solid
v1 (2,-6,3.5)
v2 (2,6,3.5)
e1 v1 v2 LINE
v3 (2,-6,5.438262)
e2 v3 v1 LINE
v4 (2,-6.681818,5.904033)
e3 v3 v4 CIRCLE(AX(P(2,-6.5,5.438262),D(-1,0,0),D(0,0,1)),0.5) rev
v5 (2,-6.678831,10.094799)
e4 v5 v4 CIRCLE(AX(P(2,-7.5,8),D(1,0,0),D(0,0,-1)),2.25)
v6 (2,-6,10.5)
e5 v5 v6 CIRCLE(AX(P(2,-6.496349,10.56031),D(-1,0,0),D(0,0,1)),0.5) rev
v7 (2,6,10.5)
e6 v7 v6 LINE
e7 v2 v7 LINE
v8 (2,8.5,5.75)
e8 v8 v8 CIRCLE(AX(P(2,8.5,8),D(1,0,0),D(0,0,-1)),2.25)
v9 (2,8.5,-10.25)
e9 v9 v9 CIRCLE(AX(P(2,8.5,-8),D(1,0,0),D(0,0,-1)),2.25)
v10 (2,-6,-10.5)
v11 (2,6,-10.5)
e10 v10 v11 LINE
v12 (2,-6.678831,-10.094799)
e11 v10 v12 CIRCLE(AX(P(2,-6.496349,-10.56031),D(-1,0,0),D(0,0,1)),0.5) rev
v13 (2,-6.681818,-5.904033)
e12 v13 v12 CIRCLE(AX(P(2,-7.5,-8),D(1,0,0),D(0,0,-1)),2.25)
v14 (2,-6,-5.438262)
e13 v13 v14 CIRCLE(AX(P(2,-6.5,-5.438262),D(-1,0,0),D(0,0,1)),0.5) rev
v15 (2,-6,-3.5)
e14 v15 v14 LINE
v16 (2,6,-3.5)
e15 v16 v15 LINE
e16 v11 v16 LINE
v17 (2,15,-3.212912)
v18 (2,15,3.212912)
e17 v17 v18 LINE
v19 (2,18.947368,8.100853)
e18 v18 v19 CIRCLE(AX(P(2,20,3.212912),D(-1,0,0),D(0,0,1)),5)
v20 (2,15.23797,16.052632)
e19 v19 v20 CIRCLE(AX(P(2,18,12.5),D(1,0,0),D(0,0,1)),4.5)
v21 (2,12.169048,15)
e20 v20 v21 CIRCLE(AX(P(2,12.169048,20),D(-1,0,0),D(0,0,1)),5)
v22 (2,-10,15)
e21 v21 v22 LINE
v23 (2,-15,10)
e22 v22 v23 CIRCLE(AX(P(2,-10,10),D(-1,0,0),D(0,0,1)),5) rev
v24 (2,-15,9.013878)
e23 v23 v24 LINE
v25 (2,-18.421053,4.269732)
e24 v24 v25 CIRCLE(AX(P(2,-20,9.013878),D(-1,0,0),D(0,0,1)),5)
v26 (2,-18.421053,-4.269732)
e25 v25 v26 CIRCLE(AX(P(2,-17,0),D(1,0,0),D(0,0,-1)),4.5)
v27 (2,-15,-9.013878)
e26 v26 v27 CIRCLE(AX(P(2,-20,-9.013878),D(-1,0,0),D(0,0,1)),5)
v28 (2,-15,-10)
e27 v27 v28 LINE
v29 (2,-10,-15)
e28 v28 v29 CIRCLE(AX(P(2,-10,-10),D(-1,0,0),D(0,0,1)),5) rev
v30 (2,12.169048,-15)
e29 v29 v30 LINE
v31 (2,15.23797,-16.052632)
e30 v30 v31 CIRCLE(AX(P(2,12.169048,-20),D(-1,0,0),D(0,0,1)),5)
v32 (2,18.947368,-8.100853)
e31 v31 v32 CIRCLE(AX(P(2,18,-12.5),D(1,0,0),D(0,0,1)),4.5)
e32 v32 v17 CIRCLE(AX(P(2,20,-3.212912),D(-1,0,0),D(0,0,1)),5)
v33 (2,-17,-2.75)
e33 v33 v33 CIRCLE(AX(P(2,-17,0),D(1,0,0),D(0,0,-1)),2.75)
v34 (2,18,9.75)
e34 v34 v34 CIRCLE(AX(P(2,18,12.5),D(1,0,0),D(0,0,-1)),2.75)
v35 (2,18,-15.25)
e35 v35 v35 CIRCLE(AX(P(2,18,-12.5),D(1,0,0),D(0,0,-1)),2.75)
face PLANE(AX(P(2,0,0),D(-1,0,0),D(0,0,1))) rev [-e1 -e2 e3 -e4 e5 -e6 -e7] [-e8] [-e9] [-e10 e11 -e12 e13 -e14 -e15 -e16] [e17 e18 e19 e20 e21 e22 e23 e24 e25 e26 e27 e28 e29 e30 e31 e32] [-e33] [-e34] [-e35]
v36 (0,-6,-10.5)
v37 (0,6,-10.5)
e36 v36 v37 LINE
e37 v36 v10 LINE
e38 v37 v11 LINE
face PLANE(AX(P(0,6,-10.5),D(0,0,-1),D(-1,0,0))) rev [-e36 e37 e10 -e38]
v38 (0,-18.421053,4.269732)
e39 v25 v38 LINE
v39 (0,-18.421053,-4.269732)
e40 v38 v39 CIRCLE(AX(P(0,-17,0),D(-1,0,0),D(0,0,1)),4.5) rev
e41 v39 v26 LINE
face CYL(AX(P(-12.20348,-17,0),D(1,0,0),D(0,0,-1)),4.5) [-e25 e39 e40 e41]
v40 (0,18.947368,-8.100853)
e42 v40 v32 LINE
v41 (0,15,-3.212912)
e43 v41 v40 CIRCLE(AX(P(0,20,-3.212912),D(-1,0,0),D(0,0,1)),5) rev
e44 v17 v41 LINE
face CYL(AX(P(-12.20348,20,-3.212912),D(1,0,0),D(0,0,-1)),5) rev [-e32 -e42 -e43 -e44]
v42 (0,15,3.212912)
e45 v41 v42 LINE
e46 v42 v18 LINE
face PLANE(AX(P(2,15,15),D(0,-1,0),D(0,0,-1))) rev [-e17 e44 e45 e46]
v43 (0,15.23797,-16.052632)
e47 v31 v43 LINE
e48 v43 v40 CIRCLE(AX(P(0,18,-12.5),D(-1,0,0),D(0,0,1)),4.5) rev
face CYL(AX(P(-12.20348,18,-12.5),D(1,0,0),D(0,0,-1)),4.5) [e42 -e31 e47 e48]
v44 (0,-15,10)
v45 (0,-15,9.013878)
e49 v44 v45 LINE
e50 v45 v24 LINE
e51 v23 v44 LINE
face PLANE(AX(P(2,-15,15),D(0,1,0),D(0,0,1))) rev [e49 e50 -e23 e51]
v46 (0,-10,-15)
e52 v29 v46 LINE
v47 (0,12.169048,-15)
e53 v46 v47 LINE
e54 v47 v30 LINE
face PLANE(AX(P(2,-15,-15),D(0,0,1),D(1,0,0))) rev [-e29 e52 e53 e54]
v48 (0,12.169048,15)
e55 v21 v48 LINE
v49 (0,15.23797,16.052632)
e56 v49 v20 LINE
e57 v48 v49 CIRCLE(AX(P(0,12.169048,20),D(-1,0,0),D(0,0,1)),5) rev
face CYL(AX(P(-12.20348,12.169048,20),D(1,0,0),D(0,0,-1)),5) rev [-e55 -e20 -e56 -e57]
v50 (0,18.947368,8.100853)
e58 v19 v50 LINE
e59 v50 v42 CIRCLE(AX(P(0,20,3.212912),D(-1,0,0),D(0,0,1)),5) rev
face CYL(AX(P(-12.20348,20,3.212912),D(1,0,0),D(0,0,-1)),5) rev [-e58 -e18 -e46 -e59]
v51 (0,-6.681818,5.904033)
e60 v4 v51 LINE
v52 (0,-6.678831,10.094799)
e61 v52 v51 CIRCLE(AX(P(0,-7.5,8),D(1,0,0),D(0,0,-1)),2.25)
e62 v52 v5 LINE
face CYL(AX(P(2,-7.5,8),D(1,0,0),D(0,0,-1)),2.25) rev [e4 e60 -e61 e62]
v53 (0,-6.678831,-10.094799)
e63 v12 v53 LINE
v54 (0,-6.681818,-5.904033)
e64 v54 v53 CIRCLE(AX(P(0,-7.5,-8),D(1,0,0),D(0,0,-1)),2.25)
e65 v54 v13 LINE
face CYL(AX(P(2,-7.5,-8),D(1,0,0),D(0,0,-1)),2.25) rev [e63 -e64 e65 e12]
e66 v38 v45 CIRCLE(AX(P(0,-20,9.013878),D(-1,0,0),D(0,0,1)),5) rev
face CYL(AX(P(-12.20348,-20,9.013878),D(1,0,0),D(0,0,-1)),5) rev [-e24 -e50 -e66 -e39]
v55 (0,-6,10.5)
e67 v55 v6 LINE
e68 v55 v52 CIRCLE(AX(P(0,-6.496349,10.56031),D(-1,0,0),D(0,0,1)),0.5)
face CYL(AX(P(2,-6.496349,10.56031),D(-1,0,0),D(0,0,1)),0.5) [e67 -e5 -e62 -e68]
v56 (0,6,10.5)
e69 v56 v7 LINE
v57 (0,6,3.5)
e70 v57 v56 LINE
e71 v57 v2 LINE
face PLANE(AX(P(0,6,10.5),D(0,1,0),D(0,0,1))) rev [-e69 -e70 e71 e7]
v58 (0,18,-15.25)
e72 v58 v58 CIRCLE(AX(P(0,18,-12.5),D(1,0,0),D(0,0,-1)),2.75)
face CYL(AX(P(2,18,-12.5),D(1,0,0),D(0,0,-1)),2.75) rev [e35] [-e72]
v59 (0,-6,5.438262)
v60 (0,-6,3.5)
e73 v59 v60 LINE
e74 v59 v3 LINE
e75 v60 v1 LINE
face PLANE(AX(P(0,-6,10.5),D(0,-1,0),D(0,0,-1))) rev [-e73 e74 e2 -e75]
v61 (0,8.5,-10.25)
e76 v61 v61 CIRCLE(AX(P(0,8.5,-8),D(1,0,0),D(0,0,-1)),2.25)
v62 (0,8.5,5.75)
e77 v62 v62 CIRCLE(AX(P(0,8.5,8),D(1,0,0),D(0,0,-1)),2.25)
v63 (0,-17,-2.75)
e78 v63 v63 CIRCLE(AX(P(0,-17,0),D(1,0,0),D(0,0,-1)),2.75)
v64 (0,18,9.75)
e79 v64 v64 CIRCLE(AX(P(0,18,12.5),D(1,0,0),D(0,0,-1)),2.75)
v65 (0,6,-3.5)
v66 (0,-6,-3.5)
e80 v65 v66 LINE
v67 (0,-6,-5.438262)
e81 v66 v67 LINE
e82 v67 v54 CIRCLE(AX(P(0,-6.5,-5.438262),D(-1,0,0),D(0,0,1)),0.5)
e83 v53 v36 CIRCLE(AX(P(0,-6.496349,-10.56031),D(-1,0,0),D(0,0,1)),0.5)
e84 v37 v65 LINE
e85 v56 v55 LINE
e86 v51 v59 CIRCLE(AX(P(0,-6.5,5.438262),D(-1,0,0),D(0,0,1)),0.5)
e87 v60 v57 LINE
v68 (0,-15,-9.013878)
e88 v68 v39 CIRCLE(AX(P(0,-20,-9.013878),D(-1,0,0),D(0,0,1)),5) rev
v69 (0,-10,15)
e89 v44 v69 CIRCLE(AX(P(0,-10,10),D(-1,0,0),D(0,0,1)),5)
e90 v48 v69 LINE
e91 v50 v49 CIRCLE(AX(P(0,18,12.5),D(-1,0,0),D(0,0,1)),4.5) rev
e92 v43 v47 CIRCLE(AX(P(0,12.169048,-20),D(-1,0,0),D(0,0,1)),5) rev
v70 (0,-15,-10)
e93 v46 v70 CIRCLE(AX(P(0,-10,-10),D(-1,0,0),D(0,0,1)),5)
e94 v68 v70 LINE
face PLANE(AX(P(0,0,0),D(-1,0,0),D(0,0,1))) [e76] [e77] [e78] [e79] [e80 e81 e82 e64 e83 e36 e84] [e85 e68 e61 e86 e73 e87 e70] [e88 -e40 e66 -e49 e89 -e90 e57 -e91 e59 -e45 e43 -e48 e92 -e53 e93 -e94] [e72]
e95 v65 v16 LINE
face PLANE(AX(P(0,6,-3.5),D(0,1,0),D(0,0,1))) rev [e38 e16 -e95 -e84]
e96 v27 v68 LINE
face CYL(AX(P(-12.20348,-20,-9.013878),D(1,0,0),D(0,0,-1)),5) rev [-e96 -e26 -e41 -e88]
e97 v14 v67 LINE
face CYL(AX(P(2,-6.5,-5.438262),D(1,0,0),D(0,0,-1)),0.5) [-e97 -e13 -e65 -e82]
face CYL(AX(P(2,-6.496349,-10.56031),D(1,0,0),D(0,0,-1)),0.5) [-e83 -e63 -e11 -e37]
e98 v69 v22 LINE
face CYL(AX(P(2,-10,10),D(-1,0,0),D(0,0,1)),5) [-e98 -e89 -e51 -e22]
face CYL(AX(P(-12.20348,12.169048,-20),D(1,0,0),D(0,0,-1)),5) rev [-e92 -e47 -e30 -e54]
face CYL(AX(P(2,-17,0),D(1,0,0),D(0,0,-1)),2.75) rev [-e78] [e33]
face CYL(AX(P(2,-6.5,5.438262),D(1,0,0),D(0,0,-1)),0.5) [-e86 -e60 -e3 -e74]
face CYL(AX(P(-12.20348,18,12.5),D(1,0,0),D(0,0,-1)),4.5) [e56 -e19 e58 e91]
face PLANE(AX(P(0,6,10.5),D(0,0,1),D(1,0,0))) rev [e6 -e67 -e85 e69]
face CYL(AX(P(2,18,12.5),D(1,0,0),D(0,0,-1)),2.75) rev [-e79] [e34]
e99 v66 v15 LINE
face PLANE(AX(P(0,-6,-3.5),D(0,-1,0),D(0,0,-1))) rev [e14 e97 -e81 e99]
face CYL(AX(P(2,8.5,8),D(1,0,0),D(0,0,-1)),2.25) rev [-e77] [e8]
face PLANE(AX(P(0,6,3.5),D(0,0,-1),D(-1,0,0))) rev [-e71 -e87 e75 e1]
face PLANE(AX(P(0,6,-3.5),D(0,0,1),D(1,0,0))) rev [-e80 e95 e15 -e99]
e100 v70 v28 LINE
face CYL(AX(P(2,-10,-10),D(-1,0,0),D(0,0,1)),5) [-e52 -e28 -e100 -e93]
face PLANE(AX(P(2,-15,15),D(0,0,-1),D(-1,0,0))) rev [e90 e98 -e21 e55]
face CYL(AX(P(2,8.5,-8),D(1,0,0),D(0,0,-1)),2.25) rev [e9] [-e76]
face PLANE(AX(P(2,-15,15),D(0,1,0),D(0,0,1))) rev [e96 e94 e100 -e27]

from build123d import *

# Parameters (mm, degrees)
SKETCH1_W            = 30
SKETCH1_H            = 30
BOSS_EXTRUDE1_DEPTH  = 2
SKETCH2_W            = 7
SKETCH2_H            = 12
CUT_EXTRUDE1_DEPTH   = 22.307275753
M4_CLEARANCE_HOLE1_D = 4.5
BOSS_EXTRUDE2_DEPTH  = 2
M5_CLEARANCE_HOLE1_D = 5.5
FILLET1_R            = 5
FILLET2_R            = 0.5


with BuildPart() as part:
    # Sketch1 → Boss-Extrude1 (new body)
    with BuildSketch(Plane(origin=(0, 0, 0), x_dir=(0, 0, -1), z_dir=(1, 0, 0))):
        Rectangle(SKETCH1_W, SKETCH1_H)
    extrude(amount=BOSS_EXTRUDE1_DEPTH)

    # Sketch2 → Cut-Extrude1 (cut, through all)
    with BuildSketch(Plane(origin=(2, 0, 0), x_dir=(0, 0, -1), z_dir=(1, 0, 0))):
        with Locations((-7, 0)):
            Rectangle(SKETCH2_W, SKETCH2_H)
        with Locations((7, 0)):
            Rectangle(SKETCH2_W, SKETCH2_H)
    extrude(amount=-CUT_EXTRUDE1_DEPTH, mode=Mode.SUBTRACT)

    # M4 Clearance Hole1 (through all)
    with Locations(Plane(origin=(2, 0, 0), x_dir=(0, 0, -1), z_dir=(1, 0, 0))):
        with Locations((-8, 8.5), (-8, -7.5), (8, 8.5), (8, -7.5)):
            Hole(M4_CLEARANCE_HOLE1_D / 2)

    # Sketch6 → Boss-Extrude2 (add)
    with BuildSketch(Plane(origin=(2, 0, 0), x_dir=(0, 0, -1), z_dir=(1, 0, 0))):
        with BuildLine():
            Line((-15, 14.258342613), (-15, 15))
            Line((-15, 15), (-9.145898034, 15))
            ThreePointArc((-9.145898034, 15), (-13.065585062, 22.464315573), (-15, 14.258342613))
        make_face()
        with BuildLine():
            Line((15, 14.258342613), (15, 15))
            Line((15, 15), (9.145898034, 15))
            ThreePointArc((9.145898034, 15), (13.065585062, 22.464315573), (15, 14.258342613))
        make_face()
        with BuildLine():
            Line((-4.031128874, -15), (4.031128874, -15))
            ThreePointArc((4.031128874, -15), (0, -21.5), (-4.031128874, -15))
        make_face()
    extrude(amount=-BOSS_EXTRUDE2_DEPTH)

    # M5 Clearance Hole1 (through all)
    with Locations(Plane(origin=(2, 0, 0), x_dir=(0, 0, -1), z_dir=(1, 0, 0))):
        with Locations((-12.5, 18), (12.5, 18), (0, -17)):
            Hole(M5_CLEARANCE_HOLE1_D / 2)

    # Fillet1
    fillet1_edges = [part.edges().sort_by_distance(p)[0] for p in [
        (1, -15, -15),
        (1, -15, 15),
        (1, 14.258342613, 15),
        (1, 15, 9.145898034),
        (1, 14.258342613, -15),
        (1, 15, -9.145898034),
        (1, -15, 4.031128874),
        (1, -15, -4.031128874),
    ]]
    fillet(fillet1_edges, radius=FILLET1_R)

    # Fillet2
    # the kernel refuses this fillet: 0.5 mm, written as the material it takes off along each edge
    with BuildSketch(Plane(origin=(4.211716771, -6, -6.322949017), x_dir=(0, 0, 1), z_dir=(-1, 0, 0))) as fillet2_piece_1:
        with BuildLine():
            CenterArc((0.884686708, -0.5), FILLET2_R, 90, 111.323686263)
            Line((0.418916219, -0.681818182), (0.409600809, -0.685454545))
            ThreePointArc((0.409600809, -0.685454545), (0.23149304, -0.327370599), (-0.00745356, -0.006666667))
            Line((-0.00745356, -0.006666667), (0, 0.01))
            Line((0, 0.01), (0.884686708, 0.01))
            Line((0.884686708, 0.01), (0.884686708, 0))
        make_face()
    extrude(amount=6.423433542, mode=Mode.SUBTRACT)
    with BuildSketch(Plane(origin=(4.057372542, -6, -9.677050983), x_dir=(0, -0.851655260409685, -0.5241023921110375), z_dir=(-1, 0, 0))) as fillet2_piece_2:
        with BuildLine():
            CenterArc((0.885636575, -0.492093973), FILLET2_R, 100.202478529, 104.477512186)
            Line((0.431309548, -0.700868859), (0.422223008, -0.705044357))
            ThreePointArc((0.422223008, -0.705044357), (0.207138222, -0.355675454), (-0.008516553, -0.005241024))
            Line((-0.008516553, -0.005241024), (0.001771273, 0.009841879))
            ThreePointArc((0.001771273, 0.009841879), (0.398536459, -0.02557712), (0.795301644, 0.009841879))
            Line((0.795301644, 0.009841879), (0.797072917, 0))
        make_face()
    extrude(amount=6.114745084, mode=Mode.SUBTRACT)
    with BuildSketch(Plane(origin=(4.057372542, -6, 9.677050983), x_dir=(0, 0, 1), z_dir=(-1, 0, 0))) as fillet2_piece_3:
        with BuildLine():
            CenterArc((0.883258668, -0.496349419), FILLET2_R, 96.927845653, 104.477512186)
            Line((0.417747823, -0.678831343), (0.408437606, -0.682480981))
            ThreePointArc((0.408437606, -0.682480981), (0.2306568, -0.326010642), (-0.00745356, -0.006666667))
            Line((-0.00745356, -0.006666667), (0, 0.01))
            ThreePointArc((0, 0.01), (0.411474508, 0.01), (0.821742824, 0.009926988))
            Line((0.821742824, 0.009926988), (0.822949017, 0))
        make_face()
    extrude(amount=6.114745084, mode=Mode.SUBTRACT)
    with BuildSketch(Plane(origin=(4.211716771, -6, 6.322949017), x_dir=(0, -0.8520285817760733, -0.5234952682084655), z_dir=(-1, 0, 0))) as fillet2_piece_4:
        with BuildLine():
            CenterArc((0.889143597, -0.492030727), FILLET2_R, 100.243314316, 111.323686264)
            Line((0.463129306, -0.753778361), (0.45460902, -0.759013314))
            Line((0.45460902, -0.759013314), (-0.008520286, -0.005234953))
            Line((-0.008520286, -0.005234953), (0.001778287, 0.009840615))
            ThreePointArc((0.001778287, 0.009840615), (0.400114618, -0.025861727), (0.79845095, 0.009840615))
            Line((0.79845095, 0.009840615), (0.800229237, 0))
        make_face()
    extrude(amount=6.423433542, mode=Mode.SUBTRACT)


solid = part.part
